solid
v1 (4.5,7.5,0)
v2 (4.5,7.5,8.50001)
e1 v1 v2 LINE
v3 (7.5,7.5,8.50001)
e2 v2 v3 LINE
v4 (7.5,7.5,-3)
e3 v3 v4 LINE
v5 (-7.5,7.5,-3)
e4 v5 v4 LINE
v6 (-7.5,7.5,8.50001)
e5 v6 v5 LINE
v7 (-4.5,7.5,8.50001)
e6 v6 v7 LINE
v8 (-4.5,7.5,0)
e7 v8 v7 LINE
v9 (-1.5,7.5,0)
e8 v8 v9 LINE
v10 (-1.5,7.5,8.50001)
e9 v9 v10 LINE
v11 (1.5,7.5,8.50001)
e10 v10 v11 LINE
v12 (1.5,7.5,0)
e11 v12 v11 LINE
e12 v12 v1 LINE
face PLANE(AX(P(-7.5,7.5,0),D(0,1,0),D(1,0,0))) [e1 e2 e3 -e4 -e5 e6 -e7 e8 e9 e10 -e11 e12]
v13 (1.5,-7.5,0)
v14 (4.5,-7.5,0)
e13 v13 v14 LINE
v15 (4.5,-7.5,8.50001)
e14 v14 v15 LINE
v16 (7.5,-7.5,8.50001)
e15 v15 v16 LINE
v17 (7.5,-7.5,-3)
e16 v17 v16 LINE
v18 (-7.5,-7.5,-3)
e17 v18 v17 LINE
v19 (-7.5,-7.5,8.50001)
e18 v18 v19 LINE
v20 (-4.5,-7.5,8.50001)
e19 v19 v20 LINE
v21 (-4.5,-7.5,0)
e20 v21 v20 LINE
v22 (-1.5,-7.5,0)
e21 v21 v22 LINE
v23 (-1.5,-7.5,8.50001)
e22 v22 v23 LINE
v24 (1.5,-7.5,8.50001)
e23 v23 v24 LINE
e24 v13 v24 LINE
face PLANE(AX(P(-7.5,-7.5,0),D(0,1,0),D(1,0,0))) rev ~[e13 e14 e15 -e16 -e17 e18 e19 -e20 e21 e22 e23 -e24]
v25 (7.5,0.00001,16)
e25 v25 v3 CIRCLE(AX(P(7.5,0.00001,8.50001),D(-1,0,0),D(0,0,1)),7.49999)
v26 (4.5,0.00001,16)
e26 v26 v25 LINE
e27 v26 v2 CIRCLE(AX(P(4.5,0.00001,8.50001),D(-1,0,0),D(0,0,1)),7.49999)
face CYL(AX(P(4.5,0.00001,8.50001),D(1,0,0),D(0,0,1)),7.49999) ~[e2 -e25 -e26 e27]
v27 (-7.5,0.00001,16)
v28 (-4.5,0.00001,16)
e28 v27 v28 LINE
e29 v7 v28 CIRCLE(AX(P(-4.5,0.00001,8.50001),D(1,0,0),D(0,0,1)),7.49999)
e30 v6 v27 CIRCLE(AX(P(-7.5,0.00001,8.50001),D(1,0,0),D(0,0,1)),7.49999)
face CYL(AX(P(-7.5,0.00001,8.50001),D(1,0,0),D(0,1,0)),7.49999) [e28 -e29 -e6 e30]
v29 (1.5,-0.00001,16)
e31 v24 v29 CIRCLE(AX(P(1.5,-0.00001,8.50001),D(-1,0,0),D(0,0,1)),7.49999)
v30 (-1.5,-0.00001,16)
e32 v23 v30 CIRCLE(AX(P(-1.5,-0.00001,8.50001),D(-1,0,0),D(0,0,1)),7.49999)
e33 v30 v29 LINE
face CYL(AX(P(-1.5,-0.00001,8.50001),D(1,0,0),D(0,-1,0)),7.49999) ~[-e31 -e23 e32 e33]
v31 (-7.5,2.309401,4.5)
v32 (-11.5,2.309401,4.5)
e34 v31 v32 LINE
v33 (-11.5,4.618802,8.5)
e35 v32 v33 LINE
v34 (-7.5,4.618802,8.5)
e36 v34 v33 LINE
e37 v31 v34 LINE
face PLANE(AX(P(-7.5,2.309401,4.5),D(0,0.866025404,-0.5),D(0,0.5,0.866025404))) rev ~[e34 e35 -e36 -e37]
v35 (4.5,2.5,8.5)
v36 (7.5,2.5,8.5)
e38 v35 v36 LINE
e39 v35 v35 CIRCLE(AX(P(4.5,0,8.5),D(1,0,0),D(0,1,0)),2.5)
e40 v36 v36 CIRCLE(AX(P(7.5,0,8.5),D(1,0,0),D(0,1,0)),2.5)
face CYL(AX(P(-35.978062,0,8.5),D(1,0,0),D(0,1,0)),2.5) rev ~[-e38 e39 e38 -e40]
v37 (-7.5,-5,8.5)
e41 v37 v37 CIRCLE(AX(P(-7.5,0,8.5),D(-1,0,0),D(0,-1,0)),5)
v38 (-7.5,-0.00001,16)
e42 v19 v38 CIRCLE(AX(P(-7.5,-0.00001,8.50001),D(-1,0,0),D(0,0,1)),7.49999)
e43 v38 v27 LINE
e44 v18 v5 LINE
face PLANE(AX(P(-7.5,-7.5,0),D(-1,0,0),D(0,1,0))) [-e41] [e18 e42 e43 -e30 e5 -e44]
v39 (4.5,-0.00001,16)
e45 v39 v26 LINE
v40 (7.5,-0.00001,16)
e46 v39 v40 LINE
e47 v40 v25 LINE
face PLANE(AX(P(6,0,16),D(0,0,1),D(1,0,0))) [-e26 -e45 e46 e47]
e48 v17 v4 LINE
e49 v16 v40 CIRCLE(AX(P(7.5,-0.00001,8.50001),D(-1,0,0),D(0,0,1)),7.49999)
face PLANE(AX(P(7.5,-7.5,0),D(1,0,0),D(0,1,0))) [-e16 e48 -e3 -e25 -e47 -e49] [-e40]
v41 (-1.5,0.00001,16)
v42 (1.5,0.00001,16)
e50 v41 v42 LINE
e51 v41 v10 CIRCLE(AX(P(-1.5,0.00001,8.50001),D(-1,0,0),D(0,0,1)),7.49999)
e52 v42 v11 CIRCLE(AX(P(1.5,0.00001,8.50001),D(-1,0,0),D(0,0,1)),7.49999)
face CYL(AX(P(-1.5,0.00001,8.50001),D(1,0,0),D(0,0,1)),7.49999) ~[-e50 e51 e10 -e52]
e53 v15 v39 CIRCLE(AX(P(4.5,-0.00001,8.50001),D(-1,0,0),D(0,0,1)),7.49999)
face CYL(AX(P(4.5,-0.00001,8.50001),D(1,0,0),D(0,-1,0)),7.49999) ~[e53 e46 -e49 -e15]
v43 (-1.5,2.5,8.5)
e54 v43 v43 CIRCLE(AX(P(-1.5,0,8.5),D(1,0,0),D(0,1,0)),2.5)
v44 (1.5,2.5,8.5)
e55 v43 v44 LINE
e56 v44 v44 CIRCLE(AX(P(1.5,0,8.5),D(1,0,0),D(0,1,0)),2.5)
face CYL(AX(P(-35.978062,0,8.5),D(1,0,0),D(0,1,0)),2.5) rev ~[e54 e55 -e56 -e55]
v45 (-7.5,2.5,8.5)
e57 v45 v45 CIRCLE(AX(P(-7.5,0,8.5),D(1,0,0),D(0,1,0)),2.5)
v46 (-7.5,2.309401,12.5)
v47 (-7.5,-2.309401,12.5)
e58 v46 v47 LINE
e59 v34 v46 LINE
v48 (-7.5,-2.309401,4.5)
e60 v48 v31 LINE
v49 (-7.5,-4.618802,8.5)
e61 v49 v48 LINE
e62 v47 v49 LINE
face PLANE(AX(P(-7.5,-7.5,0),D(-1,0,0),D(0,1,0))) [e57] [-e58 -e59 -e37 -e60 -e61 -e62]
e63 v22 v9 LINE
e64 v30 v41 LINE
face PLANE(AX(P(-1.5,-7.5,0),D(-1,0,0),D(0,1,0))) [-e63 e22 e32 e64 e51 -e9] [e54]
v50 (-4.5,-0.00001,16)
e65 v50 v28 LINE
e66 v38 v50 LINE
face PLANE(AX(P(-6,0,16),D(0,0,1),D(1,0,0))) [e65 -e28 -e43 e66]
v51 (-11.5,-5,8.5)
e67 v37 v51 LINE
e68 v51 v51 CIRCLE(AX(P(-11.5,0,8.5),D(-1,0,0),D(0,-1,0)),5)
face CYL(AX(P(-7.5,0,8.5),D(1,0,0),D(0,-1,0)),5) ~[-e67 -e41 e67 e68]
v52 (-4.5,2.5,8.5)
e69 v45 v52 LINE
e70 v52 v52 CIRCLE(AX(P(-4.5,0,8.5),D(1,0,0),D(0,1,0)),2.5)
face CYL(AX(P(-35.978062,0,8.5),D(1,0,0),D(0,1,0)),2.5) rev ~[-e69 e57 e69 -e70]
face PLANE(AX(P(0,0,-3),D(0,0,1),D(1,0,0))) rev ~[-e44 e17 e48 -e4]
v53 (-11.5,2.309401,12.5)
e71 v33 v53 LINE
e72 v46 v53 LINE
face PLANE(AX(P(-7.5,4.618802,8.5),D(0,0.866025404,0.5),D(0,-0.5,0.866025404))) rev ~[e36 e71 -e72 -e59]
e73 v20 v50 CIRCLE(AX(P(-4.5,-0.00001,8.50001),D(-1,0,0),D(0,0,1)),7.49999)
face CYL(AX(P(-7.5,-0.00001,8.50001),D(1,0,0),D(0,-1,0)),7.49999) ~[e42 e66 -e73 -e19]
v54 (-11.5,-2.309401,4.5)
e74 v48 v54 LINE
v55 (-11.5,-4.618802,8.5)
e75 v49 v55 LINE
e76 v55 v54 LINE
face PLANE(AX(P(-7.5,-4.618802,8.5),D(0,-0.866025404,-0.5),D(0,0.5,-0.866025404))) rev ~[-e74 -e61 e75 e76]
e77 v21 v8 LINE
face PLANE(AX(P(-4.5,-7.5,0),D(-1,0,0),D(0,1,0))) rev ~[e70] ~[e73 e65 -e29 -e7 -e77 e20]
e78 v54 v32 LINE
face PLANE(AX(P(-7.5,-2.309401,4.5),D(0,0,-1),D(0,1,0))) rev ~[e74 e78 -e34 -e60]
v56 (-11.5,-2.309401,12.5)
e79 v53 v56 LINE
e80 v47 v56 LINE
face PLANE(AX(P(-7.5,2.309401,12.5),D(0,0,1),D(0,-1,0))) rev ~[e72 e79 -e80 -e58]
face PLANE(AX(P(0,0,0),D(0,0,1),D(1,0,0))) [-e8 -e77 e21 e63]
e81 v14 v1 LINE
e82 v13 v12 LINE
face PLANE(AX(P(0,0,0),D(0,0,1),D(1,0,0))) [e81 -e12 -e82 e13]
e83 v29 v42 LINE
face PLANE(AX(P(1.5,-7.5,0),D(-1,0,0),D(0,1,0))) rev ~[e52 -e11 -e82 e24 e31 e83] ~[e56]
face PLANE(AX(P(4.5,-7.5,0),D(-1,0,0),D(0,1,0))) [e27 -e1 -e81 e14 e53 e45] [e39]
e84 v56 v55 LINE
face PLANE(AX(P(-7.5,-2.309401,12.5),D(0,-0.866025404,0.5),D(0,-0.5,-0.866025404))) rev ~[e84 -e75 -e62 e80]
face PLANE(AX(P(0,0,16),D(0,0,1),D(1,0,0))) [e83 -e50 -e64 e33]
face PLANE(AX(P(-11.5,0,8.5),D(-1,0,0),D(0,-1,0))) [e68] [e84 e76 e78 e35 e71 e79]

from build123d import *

# Parameters (mm, degrees)
F2_W     = 15
F2_H     = 15
F3_DEPTH = 3
F4_W     = 3
F4_H     = 15
F5_DEPTH = 16
F6_R     = 7.49999
F8_D     = 5
F7_R     = 5
F9_DEPTH = 4


# Not quite as in the source:
# - a fillet or chamfer is up to 0.001 mm smaller than in the source, because OpenCascade refuses the exact size


with BuildPart() as f3:
    # F2 (on Top) → F3 (new body)
    with BuildSketch(Plane.XY):
        Rectangle(F2_W, F2_H)
    extrude(amount=-F3_DEPTH)

    # F4 (on face) → F5 (join)
    with BuildSketch(Plane.XY):
        with Locations((-6, 0)):
            Rectangle(F4_W, F4_H)
        Rectangle(F4_W, F4_H)
        with Locations((6, 0)):
            Rectangle(F4_W, F4_H)
    extrude(amount=F5_DEPTH)

    # F6 (radius 7.5 in the source; OpenCascade refuses exactly that, so slightly less here)
    f6_edges = [f3.edges().sort_by_distance(p)[0] for p in [
        (-6, 7.5, 16),
        (0, 7.5, 16),
        (6, 7.5, 16),
        (-6, -7.5, 16),
        (0, -7.5, 16),
        (6, -7.5, 16),
    ]]
    fillet(f6_edges, radius=F6_R)

    # F8 (through all)
    with Locations(Plane(origin=(-7.5, 0, 0), x_dir=(0, -1, 0), z_dir=(-1, 0, 0))):
        with Locations((0, 8.5)):
            Hole(F8_D / 2)

    # F7 (on face) → F9 (join)
    with BuildSketch(Plane(origin=(-7.5, 0, 0), x_dir=(0, -1, 0), z_dir=(-1, 0, 0))):
        with Locations((0, 8.5)):
            Circle(F7_R)
        Polygon((-4.6188021535, 8.5), (-2.3094010768, 12.5), (2.3094010768, 12.5), (4.6188021535, 8.5), (2.3094010768, 4.5), (-2.3094010768, 4.5), align=None, mode=Mode.SUBTRACT)
    extrude(amount=F9_DEPTH)


solid = f3.part
